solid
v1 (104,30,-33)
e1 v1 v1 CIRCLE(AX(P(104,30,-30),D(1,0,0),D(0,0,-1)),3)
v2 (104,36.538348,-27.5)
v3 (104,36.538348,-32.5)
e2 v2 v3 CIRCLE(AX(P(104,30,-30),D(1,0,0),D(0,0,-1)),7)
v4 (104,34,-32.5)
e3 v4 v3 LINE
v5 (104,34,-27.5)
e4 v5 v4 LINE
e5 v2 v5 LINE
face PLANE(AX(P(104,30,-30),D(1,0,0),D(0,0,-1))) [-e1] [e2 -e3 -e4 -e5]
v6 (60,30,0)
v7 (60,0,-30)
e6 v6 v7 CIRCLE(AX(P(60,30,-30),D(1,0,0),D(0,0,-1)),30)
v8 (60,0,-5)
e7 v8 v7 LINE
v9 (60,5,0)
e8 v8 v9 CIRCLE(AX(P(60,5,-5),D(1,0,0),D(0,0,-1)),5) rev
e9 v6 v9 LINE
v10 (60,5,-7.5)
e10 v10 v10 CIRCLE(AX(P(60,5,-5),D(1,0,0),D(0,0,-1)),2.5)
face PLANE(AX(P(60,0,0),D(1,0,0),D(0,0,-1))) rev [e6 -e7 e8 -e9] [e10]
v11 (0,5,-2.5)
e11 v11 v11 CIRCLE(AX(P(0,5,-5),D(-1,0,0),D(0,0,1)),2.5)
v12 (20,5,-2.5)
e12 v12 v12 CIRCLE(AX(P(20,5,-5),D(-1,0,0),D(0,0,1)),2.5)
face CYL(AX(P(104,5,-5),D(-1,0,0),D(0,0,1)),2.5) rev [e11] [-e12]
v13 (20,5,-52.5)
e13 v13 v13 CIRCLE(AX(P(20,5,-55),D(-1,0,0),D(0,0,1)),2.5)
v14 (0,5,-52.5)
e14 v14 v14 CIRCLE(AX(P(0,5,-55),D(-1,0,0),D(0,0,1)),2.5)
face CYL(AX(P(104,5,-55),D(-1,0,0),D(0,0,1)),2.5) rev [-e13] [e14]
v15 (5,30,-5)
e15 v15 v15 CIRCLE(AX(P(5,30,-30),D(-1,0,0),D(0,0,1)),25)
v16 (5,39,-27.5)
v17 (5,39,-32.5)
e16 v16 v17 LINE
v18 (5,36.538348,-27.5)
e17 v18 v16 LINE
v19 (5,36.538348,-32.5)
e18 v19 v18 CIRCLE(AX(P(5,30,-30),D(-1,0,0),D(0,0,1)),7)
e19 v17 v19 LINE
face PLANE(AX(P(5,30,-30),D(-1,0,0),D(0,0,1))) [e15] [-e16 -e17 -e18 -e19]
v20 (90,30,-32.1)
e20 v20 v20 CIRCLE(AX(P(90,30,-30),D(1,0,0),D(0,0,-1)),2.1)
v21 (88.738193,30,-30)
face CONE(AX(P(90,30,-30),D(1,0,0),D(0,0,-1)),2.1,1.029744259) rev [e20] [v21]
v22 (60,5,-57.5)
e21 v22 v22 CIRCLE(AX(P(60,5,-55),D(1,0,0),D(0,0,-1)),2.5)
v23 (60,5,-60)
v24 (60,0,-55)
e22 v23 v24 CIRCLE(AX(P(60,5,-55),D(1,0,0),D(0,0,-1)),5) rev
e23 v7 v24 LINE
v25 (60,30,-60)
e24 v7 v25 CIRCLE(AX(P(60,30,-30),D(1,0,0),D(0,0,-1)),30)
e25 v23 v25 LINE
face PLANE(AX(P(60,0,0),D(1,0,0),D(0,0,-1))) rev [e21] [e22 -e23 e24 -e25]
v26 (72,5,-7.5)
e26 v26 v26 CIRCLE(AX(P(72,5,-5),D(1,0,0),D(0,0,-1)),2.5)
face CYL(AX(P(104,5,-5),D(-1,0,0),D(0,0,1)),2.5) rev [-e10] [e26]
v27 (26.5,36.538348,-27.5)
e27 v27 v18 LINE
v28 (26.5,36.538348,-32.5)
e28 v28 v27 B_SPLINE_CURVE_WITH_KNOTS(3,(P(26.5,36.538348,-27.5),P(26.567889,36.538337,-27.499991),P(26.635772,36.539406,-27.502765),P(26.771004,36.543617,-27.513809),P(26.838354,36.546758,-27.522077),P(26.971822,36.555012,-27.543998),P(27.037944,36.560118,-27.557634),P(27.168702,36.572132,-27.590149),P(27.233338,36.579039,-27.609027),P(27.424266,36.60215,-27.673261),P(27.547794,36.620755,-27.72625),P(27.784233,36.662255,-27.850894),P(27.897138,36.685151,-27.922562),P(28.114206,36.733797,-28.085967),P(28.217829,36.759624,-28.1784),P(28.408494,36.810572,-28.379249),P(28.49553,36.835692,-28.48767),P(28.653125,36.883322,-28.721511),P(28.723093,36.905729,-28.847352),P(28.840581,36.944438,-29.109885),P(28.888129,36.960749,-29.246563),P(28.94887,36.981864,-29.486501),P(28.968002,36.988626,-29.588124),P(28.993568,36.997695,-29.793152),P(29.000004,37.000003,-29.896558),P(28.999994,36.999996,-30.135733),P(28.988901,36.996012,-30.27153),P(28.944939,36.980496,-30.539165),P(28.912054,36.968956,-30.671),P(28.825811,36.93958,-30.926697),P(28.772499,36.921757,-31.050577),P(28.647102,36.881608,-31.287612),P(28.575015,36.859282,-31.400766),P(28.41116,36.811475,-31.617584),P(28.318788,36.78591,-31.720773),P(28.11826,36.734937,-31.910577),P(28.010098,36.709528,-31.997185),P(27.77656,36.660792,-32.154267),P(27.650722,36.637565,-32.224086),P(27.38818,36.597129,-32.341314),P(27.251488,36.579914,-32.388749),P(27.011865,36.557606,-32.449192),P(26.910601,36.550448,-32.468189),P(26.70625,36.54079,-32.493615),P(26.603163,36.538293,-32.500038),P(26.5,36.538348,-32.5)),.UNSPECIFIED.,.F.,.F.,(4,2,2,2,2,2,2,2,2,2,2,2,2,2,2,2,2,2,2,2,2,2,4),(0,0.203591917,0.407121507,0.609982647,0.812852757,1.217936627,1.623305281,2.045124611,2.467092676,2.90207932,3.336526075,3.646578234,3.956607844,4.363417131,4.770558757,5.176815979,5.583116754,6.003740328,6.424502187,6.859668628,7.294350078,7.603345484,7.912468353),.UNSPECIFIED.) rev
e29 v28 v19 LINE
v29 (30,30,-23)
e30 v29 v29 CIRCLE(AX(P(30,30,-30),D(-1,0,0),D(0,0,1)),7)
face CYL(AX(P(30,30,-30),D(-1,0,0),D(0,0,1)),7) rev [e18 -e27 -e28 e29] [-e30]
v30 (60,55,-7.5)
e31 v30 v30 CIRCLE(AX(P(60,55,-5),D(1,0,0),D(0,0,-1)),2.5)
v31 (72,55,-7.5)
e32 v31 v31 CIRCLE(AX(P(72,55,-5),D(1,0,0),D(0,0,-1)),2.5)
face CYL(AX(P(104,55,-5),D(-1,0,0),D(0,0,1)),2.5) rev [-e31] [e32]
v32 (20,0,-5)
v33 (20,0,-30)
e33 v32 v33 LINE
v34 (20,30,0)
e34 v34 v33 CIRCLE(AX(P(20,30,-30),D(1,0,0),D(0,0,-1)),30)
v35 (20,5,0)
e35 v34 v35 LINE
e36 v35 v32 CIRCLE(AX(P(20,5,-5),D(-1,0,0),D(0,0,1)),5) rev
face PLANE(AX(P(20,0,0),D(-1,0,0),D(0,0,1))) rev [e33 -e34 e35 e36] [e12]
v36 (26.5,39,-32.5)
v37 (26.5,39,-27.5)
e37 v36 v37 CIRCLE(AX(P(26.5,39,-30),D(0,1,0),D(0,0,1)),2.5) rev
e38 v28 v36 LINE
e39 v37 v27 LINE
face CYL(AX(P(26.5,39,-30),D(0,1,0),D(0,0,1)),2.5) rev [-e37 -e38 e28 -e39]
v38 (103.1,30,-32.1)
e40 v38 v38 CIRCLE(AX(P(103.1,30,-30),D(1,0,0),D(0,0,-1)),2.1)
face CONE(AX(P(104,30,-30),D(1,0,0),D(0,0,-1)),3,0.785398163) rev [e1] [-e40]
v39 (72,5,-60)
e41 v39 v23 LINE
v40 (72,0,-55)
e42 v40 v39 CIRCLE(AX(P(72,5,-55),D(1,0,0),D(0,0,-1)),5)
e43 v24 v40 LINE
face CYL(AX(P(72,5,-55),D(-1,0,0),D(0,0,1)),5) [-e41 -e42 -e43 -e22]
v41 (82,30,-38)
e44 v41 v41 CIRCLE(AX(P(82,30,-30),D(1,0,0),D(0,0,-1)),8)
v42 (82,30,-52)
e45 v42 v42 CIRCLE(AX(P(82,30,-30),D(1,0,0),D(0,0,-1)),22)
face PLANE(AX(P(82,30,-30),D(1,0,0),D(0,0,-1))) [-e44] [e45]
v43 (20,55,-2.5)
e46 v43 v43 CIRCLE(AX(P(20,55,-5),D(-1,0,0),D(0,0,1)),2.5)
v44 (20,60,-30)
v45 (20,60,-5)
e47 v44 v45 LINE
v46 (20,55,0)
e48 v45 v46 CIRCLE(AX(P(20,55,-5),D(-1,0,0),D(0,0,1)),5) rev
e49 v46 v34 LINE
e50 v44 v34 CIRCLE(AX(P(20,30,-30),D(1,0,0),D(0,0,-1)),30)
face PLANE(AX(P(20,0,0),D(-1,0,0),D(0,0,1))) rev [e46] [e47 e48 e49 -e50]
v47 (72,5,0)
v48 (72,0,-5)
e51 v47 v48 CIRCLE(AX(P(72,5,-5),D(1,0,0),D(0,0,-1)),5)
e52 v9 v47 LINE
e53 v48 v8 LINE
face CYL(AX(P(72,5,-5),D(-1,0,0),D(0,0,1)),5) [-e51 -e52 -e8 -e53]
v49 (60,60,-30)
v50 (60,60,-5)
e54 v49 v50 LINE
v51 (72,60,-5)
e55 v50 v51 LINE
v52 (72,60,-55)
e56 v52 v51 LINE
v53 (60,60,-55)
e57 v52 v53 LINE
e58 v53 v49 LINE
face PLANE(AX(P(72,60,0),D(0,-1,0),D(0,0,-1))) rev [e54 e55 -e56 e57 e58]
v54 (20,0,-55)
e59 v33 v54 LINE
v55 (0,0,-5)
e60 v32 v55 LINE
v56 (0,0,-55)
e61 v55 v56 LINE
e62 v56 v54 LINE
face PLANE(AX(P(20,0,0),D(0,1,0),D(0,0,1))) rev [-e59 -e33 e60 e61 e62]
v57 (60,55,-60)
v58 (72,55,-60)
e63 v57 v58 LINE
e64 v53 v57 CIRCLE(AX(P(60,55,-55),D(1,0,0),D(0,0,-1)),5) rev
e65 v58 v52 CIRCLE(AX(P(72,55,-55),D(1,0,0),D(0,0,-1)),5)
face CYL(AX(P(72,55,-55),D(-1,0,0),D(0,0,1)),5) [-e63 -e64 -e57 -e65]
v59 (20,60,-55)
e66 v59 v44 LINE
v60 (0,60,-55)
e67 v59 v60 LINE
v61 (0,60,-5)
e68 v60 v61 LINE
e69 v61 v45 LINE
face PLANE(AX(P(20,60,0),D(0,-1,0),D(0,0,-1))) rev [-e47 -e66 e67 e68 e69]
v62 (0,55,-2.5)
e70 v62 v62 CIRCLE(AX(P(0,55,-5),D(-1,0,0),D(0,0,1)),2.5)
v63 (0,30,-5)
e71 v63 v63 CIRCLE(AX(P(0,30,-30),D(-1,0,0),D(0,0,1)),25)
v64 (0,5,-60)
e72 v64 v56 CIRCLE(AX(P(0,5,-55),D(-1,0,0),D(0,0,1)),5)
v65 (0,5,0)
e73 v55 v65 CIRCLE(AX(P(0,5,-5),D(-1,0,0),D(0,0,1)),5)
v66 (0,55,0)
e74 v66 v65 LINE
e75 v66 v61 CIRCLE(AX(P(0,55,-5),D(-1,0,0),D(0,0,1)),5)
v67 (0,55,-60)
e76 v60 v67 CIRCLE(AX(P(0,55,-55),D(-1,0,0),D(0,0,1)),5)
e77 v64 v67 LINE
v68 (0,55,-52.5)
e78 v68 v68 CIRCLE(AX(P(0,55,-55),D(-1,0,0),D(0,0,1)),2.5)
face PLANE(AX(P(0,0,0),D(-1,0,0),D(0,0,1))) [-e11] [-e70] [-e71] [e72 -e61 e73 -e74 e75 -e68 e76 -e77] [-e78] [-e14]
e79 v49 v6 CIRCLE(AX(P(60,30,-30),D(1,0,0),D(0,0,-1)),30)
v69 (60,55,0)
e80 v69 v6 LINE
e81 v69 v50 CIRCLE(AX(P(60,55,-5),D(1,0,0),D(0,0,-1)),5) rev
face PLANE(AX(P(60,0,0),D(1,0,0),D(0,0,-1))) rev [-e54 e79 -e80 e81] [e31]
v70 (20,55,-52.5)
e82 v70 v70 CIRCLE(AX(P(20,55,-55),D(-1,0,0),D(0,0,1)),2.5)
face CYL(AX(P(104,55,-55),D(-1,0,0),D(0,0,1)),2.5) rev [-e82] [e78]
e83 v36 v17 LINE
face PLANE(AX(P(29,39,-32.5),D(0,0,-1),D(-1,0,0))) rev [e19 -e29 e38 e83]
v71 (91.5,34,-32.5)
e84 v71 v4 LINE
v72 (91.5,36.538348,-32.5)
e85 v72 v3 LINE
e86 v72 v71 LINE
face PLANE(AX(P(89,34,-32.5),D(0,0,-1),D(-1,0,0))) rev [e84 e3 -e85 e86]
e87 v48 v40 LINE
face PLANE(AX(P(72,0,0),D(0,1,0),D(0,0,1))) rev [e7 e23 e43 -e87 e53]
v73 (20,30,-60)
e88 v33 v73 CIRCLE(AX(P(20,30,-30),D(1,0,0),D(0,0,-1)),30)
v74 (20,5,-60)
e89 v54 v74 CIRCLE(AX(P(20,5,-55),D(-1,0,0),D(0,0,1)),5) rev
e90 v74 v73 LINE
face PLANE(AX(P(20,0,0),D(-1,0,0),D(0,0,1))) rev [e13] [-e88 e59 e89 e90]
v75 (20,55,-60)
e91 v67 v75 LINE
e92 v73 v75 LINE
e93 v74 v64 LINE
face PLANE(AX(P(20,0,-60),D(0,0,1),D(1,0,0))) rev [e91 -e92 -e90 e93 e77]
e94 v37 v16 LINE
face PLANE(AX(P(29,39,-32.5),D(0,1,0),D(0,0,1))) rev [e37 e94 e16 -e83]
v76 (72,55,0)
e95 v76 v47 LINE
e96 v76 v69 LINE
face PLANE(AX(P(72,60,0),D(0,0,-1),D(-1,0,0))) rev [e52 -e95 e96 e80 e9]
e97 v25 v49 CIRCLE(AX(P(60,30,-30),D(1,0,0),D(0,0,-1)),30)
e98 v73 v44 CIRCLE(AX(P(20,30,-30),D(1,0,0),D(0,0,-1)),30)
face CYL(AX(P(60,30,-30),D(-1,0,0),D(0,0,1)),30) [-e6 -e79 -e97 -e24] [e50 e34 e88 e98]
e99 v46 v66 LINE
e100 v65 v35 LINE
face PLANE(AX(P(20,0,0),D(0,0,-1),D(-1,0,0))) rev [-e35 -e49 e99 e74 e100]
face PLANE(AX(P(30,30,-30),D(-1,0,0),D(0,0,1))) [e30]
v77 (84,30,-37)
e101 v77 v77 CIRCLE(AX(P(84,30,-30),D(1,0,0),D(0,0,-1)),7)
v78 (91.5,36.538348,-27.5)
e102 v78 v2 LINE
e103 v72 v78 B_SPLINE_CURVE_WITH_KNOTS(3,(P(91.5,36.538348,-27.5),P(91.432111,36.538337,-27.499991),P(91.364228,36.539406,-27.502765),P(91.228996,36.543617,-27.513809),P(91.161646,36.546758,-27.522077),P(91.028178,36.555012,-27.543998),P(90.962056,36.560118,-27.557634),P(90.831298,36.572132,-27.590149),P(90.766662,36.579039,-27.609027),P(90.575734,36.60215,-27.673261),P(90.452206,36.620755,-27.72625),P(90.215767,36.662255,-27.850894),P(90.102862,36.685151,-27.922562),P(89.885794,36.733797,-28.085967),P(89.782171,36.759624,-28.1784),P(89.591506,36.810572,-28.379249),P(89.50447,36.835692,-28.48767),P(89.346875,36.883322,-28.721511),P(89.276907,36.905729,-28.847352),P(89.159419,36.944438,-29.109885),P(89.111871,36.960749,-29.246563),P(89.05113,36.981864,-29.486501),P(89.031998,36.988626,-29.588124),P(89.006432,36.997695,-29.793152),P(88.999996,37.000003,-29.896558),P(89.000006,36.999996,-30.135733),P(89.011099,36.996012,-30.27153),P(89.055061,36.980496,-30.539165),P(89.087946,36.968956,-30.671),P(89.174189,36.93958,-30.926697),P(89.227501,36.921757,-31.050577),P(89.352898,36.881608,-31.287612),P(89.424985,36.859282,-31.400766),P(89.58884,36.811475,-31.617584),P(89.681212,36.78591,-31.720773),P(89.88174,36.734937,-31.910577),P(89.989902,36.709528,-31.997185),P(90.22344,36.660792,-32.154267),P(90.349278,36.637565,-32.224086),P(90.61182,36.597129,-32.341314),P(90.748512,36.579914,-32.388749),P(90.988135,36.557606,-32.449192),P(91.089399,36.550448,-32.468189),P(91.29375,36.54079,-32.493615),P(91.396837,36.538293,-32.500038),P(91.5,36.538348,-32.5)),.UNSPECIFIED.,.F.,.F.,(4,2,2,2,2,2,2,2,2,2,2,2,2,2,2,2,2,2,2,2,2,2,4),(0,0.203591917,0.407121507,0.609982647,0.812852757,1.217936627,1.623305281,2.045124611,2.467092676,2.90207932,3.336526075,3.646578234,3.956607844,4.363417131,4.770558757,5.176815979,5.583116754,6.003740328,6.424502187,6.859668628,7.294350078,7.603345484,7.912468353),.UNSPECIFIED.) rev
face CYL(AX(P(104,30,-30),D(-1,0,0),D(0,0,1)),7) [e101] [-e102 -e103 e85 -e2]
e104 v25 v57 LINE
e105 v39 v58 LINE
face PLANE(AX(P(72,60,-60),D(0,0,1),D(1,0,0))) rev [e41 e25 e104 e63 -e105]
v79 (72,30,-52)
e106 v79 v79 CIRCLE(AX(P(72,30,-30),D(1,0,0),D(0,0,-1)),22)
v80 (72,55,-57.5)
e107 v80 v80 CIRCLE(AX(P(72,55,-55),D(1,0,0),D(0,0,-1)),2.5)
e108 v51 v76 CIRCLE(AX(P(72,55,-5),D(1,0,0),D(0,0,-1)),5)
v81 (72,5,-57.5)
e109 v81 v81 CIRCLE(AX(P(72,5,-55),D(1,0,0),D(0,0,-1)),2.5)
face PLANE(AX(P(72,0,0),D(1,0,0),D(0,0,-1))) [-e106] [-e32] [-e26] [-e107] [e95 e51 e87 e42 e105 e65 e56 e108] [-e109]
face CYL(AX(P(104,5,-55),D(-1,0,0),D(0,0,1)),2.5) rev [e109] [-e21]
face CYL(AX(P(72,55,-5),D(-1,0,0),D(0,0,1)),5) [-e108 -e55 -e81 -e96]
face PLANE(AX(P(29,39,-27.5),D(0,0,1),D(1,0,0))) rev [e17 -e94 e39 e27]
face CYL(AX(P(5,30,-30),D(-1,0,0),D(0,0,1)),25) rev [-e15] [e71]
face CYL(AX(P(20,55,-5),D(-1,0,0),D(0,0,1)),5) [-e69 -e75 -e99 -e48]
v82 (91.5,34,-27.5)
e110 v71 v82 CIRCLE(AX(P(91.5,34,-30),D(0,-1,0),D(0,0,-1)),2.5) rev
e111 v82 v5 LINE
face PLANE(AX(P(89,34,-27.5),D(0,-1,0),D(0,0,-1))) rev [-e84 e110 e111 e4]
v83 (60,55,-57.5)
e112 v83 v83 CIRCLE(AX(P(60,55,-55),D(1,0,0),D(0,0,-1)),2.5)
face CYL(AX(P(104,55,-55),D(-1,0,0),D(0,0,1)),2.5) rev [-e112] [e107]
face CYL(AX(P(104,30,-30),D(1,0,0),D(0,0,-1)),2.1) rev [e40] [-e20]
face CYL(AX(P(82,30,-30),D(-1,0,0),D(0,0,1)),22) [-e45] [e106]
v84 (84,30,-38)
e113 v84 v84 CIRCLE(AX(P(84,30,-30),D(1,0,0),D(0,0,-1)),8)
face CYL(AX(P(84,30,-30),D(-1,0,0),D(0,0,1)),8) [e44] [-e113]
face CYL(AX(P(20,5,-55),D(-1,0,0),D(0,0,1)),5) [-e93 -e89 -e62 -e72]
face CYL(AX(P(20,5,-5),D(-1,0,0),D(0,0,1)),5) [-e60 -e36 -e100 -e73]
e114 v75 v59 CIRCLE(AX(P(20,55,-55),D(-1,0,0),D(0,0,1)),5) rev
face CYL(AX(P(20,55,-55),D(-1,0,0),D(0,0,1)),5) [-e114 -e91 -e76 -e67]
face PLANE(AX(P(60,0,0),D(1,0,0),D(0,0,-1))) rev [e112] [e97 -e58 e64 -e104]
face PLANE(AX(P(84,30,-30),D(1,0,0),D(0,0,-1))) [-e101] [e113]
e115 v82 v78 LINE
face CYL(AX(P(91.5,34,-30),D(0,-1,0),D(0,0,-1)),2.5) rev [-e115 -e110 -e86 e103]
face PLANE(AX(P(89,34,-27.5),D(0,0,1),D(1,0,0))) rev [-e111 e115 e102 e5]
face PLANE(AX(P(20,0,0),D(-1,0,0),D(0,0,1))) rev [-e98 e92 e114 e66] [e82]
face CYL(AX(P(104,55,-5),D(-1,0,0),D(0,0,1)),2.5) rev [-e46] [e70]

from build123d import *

# Parameters (mm, degrees)
SKETCH_1_W           = 60
SKETCH_1_H           = 60
EXTRUDE_1_DEPTH      = 20
SKETCH_2_R           = 30
EXTRUDE_2_DEPTH      = 40
SKETCH_3_W           = 60
SKETCH_3_H           = 60
EXTRUDE_3_DEPTH      = 12
SKETCH_4_R           = 22
EXTRUDE_4_DEPTH      = 10
SKETCH_5_R           = 7
EXTRUDE_5_DEPTH      = 22
SKETCH_6_R           = 2.5
CUT_EXTRUDE_1_DEPTH  = 135.223693885
SKETCH_7_R           = 25
CUT_EXTRUDE_2_DEPTH  = 5
SKETCH_8_R           = 7
CUT_EXTRUDE_3_DEPTH  = 25
CUT_EXTRUDE_START    = -15
CUT_EXTRUDE_5_DEPTH  = 15
FILLET_1_R           = 2.5
SKETCH_11_R          = 8
EXTRUDE_6_DEPTH      = 2
M5X0_751_D           = 4.2
M5X0_751_DEPTH       = 14
M5X0_751_CSINK_D     = 6
M5X0_751_CSINK_ANGLE = 90
M5X0_751_TIP         = 1.2618073
FILLET_2_R           = 5
SKETCH_15_W          = 5
SKETCH_15_H          = 2.461651585
CUT_EXTRUDE_6_DEPTH  = 24
FILLET_3_R           = 2.5


with BuildPart() as part:
    # Эскиз1 → Бобышка-Вытянуть1 (new body)
    with BuildSketch(Plane(origin=(0, 0, 0), x_dir=(0, 0, -1), z_dir=(1, 0, 0))):
        with Locations((30, 30)):
            Rectangle(SKETCH_1_W, SKETCH_1_H)
    extrude(amount=EXTRUDE_1_DEPTH)

    # Эскиз2 → Бобышка-Вытянуть2 (add)
    with BuildSketch(Plane(origin=(20, 0, 0), x_dir=(0, 0, -1), z_dir=(1, 0, 0))):
        with Locations((30, 30)):
            Circle(SKETCH_2_R)
    extrude(amount=EXTRUDE_2_DEPTH)

    # Эскиз3 → Бобышка-Вытянуть3 (add)
    with BuildSketch(Plane(origin=(60, 0, 0), x_dir=(0, 0, -1), z_dir=(1, 0, 0))):
        with Locations((30, 30)):
            Rectangle(SKETCH_3_W, SKETCH_3_H)
    extrude(amount=EXTRUDE_3_DEPTH)

    # Эскиз4 → Бобышка-Вытянуть4 (add)
    with BuildSketch(Plane(origin=(72, 0, 0), x_dir=(0, 0, -1), z_dir=(1, 0, 0))):
        with Locations((30, 30)):
            Circle(SKETCH_4_R)
    extrude(amount=EXTRUDE_4_DEPTH)

    # Эскиз5 → Бобышка-Вытянуть5 (add)
    with BuildSketch(Plane(origin=(82, 0, 0), x_dir=(0, 0, -1), z_dir=(1, 0, 0))):
        with Locations((30, 30)):
            Circle(SKETCH_5_R)
    extrude(amount=EXTRUDE_5_DEPTH)

    # Эскиз6 → Вырез-Вытянуть1 (cut, through all)
    with BuildSketch(Plane.ZY):
        with Locations(Location((-55, 55, 0), (0, 0, 180))):
            Circle(SKETCH_6_R)
        with Locations(Location((-5, 55, 0), (0, 0, 180))):
            Circle(SKETCH_6_R)
        with Locations(Location((-5, 5, 0), (0, 0, 180))):
            Circle(SKETCH_6_R)
        with Locations(Location((-55, 5, 0), (0, 0, 180))):
            Circle(SKETCH_6_R)
    extrude(amount=-CUT_EXTRUDE_1_DEPTH, mode=Mode.SUBTRACT)

    # Эскиз7 → Вырез-Вытянуть2 (cut)
    with BuildSketch(Plane.ZY):
        with Locations((-30, 30)):
            Circle(SKETCH_7_R)
    extrude(amount=-CUT_EXTRUDE_2_DEPTH, mode=Mode.SUBTRACT)

    # Эскиз8 → Вырез-Вытянуть3 (cut)
    with BuildSketch(Plane.ZY.offset(-5)):
        with Locations(Location((-30, 30, 0), (0, 0, 180))):
            Circle(SKETCH_8_R)
    extrude(amount=-CUT_EXTRUDE_3_DEPTH, mode=Mode.SUBTRACT)

    # Эскиз10 → Вырез-Вытянуть5 (cut)
    with BuildSketch(Plane(origin=(104, 0, 0), x_dir=(0, 0, -1), z_dir=(1, 0, 0)).offset(CUT_EXTRUDE_START)):
        with BuildLine():
            Line((27.5, 34), (32.5, 34))
            Line((32.5, 34), (32.5, 36.538348415))
            ThreePointArc((32.5, 36.538348415), (30, 37), (27.5, 36.538348415))
            Line((27.5, 36.538348415), (27.5, 34))
        make_face()
    extrude(amount=CUT_EXTRUDE_5_DEPTH, mode=Mode.SUBTRACT)

    # Скругление1
    fillet_1_edges = [part.edges().sort_by_distance(p)[0] for p in [
        (89, 35.269174208, -27.5),
        (89, 35.269174208, -32.5),
    ]]
    fillet(fillet_1_edges, radius=FILLET_1_R - 0.0001)  # a hair under: the kernel refuses the full size

    # Эскиз11 → Бобышка-Вытянуть6 (add)
    with BuildSketch(Plane(origin=(82, 0, 0), x_dir=(0, 0, -1), z_dir=(1, 0, 0))):
        with Locations((30, 30)):
            Circle(SKETCH_11_R)
    extrude(amount=EXTRUDE_6_DEPTH)

    # Отверстие обработанное метчиком M5x0.751
    with Locations(Plane(origin=(104, 0, 0), x_dir=(0, 0, -1), z_dir=(1, 0, 0))):
        with Locations((30, 30)):
            CounterSinkHole(M5X0_751_D / 2, M5X0_751_CSINK_D / 2, depth=M5X0_751_DEPTH, counter_sink_angle=M5X0_751_CSINK_ANGLE)
            with Locations((0, 0, -(M5X0_751_DEPTH + M5X0_751_TIP / 2))):  # 118° drill point
                Cone(0, M5X0_751_D / 2, M5X0_751_TIP, mode=Mode.SUBTRACT)

    # Скругление2
    fillet_2_edges = [part.edges().sort_by_distance(p)[0] for p in [
        (66, 60, 0),
        (66, 0, 0),
        (66, 0, -60),
        (66, 60, -60),
        (10, 60, 0),
        (10, 60, -60),
        (10, 0, -60),
        (10, 0, 0),
    ]]
    fillet(fillet_2_edges, radius=FILLET_2_R)

    # Эскиз15 → Вырез-Вытянуть6 (cut)
    with BuildSketch(Plane.ZY.offset(-5)):
        with Locations((-30, 37.769174208)):
            Rectangle(SKETCH_15_W, SKETCH_15_H)
    extrude(amount=-CUT_EXTRUDE_6_DEPTH, mode=Mode.SUBTRACT)

    # Скругление3
    fillet_3_edges = [part.edges().sort_by_distance(p)[0] for p in [
        (29, 37.769174208, -32.5),
        (29, 37.769174208, -27.5),
    ]]
    fillet(fillet_3_edges, radius=FILLET_3_R - 0.0001)  # a hair under: the kernel refuses the full size


solid = part.part
